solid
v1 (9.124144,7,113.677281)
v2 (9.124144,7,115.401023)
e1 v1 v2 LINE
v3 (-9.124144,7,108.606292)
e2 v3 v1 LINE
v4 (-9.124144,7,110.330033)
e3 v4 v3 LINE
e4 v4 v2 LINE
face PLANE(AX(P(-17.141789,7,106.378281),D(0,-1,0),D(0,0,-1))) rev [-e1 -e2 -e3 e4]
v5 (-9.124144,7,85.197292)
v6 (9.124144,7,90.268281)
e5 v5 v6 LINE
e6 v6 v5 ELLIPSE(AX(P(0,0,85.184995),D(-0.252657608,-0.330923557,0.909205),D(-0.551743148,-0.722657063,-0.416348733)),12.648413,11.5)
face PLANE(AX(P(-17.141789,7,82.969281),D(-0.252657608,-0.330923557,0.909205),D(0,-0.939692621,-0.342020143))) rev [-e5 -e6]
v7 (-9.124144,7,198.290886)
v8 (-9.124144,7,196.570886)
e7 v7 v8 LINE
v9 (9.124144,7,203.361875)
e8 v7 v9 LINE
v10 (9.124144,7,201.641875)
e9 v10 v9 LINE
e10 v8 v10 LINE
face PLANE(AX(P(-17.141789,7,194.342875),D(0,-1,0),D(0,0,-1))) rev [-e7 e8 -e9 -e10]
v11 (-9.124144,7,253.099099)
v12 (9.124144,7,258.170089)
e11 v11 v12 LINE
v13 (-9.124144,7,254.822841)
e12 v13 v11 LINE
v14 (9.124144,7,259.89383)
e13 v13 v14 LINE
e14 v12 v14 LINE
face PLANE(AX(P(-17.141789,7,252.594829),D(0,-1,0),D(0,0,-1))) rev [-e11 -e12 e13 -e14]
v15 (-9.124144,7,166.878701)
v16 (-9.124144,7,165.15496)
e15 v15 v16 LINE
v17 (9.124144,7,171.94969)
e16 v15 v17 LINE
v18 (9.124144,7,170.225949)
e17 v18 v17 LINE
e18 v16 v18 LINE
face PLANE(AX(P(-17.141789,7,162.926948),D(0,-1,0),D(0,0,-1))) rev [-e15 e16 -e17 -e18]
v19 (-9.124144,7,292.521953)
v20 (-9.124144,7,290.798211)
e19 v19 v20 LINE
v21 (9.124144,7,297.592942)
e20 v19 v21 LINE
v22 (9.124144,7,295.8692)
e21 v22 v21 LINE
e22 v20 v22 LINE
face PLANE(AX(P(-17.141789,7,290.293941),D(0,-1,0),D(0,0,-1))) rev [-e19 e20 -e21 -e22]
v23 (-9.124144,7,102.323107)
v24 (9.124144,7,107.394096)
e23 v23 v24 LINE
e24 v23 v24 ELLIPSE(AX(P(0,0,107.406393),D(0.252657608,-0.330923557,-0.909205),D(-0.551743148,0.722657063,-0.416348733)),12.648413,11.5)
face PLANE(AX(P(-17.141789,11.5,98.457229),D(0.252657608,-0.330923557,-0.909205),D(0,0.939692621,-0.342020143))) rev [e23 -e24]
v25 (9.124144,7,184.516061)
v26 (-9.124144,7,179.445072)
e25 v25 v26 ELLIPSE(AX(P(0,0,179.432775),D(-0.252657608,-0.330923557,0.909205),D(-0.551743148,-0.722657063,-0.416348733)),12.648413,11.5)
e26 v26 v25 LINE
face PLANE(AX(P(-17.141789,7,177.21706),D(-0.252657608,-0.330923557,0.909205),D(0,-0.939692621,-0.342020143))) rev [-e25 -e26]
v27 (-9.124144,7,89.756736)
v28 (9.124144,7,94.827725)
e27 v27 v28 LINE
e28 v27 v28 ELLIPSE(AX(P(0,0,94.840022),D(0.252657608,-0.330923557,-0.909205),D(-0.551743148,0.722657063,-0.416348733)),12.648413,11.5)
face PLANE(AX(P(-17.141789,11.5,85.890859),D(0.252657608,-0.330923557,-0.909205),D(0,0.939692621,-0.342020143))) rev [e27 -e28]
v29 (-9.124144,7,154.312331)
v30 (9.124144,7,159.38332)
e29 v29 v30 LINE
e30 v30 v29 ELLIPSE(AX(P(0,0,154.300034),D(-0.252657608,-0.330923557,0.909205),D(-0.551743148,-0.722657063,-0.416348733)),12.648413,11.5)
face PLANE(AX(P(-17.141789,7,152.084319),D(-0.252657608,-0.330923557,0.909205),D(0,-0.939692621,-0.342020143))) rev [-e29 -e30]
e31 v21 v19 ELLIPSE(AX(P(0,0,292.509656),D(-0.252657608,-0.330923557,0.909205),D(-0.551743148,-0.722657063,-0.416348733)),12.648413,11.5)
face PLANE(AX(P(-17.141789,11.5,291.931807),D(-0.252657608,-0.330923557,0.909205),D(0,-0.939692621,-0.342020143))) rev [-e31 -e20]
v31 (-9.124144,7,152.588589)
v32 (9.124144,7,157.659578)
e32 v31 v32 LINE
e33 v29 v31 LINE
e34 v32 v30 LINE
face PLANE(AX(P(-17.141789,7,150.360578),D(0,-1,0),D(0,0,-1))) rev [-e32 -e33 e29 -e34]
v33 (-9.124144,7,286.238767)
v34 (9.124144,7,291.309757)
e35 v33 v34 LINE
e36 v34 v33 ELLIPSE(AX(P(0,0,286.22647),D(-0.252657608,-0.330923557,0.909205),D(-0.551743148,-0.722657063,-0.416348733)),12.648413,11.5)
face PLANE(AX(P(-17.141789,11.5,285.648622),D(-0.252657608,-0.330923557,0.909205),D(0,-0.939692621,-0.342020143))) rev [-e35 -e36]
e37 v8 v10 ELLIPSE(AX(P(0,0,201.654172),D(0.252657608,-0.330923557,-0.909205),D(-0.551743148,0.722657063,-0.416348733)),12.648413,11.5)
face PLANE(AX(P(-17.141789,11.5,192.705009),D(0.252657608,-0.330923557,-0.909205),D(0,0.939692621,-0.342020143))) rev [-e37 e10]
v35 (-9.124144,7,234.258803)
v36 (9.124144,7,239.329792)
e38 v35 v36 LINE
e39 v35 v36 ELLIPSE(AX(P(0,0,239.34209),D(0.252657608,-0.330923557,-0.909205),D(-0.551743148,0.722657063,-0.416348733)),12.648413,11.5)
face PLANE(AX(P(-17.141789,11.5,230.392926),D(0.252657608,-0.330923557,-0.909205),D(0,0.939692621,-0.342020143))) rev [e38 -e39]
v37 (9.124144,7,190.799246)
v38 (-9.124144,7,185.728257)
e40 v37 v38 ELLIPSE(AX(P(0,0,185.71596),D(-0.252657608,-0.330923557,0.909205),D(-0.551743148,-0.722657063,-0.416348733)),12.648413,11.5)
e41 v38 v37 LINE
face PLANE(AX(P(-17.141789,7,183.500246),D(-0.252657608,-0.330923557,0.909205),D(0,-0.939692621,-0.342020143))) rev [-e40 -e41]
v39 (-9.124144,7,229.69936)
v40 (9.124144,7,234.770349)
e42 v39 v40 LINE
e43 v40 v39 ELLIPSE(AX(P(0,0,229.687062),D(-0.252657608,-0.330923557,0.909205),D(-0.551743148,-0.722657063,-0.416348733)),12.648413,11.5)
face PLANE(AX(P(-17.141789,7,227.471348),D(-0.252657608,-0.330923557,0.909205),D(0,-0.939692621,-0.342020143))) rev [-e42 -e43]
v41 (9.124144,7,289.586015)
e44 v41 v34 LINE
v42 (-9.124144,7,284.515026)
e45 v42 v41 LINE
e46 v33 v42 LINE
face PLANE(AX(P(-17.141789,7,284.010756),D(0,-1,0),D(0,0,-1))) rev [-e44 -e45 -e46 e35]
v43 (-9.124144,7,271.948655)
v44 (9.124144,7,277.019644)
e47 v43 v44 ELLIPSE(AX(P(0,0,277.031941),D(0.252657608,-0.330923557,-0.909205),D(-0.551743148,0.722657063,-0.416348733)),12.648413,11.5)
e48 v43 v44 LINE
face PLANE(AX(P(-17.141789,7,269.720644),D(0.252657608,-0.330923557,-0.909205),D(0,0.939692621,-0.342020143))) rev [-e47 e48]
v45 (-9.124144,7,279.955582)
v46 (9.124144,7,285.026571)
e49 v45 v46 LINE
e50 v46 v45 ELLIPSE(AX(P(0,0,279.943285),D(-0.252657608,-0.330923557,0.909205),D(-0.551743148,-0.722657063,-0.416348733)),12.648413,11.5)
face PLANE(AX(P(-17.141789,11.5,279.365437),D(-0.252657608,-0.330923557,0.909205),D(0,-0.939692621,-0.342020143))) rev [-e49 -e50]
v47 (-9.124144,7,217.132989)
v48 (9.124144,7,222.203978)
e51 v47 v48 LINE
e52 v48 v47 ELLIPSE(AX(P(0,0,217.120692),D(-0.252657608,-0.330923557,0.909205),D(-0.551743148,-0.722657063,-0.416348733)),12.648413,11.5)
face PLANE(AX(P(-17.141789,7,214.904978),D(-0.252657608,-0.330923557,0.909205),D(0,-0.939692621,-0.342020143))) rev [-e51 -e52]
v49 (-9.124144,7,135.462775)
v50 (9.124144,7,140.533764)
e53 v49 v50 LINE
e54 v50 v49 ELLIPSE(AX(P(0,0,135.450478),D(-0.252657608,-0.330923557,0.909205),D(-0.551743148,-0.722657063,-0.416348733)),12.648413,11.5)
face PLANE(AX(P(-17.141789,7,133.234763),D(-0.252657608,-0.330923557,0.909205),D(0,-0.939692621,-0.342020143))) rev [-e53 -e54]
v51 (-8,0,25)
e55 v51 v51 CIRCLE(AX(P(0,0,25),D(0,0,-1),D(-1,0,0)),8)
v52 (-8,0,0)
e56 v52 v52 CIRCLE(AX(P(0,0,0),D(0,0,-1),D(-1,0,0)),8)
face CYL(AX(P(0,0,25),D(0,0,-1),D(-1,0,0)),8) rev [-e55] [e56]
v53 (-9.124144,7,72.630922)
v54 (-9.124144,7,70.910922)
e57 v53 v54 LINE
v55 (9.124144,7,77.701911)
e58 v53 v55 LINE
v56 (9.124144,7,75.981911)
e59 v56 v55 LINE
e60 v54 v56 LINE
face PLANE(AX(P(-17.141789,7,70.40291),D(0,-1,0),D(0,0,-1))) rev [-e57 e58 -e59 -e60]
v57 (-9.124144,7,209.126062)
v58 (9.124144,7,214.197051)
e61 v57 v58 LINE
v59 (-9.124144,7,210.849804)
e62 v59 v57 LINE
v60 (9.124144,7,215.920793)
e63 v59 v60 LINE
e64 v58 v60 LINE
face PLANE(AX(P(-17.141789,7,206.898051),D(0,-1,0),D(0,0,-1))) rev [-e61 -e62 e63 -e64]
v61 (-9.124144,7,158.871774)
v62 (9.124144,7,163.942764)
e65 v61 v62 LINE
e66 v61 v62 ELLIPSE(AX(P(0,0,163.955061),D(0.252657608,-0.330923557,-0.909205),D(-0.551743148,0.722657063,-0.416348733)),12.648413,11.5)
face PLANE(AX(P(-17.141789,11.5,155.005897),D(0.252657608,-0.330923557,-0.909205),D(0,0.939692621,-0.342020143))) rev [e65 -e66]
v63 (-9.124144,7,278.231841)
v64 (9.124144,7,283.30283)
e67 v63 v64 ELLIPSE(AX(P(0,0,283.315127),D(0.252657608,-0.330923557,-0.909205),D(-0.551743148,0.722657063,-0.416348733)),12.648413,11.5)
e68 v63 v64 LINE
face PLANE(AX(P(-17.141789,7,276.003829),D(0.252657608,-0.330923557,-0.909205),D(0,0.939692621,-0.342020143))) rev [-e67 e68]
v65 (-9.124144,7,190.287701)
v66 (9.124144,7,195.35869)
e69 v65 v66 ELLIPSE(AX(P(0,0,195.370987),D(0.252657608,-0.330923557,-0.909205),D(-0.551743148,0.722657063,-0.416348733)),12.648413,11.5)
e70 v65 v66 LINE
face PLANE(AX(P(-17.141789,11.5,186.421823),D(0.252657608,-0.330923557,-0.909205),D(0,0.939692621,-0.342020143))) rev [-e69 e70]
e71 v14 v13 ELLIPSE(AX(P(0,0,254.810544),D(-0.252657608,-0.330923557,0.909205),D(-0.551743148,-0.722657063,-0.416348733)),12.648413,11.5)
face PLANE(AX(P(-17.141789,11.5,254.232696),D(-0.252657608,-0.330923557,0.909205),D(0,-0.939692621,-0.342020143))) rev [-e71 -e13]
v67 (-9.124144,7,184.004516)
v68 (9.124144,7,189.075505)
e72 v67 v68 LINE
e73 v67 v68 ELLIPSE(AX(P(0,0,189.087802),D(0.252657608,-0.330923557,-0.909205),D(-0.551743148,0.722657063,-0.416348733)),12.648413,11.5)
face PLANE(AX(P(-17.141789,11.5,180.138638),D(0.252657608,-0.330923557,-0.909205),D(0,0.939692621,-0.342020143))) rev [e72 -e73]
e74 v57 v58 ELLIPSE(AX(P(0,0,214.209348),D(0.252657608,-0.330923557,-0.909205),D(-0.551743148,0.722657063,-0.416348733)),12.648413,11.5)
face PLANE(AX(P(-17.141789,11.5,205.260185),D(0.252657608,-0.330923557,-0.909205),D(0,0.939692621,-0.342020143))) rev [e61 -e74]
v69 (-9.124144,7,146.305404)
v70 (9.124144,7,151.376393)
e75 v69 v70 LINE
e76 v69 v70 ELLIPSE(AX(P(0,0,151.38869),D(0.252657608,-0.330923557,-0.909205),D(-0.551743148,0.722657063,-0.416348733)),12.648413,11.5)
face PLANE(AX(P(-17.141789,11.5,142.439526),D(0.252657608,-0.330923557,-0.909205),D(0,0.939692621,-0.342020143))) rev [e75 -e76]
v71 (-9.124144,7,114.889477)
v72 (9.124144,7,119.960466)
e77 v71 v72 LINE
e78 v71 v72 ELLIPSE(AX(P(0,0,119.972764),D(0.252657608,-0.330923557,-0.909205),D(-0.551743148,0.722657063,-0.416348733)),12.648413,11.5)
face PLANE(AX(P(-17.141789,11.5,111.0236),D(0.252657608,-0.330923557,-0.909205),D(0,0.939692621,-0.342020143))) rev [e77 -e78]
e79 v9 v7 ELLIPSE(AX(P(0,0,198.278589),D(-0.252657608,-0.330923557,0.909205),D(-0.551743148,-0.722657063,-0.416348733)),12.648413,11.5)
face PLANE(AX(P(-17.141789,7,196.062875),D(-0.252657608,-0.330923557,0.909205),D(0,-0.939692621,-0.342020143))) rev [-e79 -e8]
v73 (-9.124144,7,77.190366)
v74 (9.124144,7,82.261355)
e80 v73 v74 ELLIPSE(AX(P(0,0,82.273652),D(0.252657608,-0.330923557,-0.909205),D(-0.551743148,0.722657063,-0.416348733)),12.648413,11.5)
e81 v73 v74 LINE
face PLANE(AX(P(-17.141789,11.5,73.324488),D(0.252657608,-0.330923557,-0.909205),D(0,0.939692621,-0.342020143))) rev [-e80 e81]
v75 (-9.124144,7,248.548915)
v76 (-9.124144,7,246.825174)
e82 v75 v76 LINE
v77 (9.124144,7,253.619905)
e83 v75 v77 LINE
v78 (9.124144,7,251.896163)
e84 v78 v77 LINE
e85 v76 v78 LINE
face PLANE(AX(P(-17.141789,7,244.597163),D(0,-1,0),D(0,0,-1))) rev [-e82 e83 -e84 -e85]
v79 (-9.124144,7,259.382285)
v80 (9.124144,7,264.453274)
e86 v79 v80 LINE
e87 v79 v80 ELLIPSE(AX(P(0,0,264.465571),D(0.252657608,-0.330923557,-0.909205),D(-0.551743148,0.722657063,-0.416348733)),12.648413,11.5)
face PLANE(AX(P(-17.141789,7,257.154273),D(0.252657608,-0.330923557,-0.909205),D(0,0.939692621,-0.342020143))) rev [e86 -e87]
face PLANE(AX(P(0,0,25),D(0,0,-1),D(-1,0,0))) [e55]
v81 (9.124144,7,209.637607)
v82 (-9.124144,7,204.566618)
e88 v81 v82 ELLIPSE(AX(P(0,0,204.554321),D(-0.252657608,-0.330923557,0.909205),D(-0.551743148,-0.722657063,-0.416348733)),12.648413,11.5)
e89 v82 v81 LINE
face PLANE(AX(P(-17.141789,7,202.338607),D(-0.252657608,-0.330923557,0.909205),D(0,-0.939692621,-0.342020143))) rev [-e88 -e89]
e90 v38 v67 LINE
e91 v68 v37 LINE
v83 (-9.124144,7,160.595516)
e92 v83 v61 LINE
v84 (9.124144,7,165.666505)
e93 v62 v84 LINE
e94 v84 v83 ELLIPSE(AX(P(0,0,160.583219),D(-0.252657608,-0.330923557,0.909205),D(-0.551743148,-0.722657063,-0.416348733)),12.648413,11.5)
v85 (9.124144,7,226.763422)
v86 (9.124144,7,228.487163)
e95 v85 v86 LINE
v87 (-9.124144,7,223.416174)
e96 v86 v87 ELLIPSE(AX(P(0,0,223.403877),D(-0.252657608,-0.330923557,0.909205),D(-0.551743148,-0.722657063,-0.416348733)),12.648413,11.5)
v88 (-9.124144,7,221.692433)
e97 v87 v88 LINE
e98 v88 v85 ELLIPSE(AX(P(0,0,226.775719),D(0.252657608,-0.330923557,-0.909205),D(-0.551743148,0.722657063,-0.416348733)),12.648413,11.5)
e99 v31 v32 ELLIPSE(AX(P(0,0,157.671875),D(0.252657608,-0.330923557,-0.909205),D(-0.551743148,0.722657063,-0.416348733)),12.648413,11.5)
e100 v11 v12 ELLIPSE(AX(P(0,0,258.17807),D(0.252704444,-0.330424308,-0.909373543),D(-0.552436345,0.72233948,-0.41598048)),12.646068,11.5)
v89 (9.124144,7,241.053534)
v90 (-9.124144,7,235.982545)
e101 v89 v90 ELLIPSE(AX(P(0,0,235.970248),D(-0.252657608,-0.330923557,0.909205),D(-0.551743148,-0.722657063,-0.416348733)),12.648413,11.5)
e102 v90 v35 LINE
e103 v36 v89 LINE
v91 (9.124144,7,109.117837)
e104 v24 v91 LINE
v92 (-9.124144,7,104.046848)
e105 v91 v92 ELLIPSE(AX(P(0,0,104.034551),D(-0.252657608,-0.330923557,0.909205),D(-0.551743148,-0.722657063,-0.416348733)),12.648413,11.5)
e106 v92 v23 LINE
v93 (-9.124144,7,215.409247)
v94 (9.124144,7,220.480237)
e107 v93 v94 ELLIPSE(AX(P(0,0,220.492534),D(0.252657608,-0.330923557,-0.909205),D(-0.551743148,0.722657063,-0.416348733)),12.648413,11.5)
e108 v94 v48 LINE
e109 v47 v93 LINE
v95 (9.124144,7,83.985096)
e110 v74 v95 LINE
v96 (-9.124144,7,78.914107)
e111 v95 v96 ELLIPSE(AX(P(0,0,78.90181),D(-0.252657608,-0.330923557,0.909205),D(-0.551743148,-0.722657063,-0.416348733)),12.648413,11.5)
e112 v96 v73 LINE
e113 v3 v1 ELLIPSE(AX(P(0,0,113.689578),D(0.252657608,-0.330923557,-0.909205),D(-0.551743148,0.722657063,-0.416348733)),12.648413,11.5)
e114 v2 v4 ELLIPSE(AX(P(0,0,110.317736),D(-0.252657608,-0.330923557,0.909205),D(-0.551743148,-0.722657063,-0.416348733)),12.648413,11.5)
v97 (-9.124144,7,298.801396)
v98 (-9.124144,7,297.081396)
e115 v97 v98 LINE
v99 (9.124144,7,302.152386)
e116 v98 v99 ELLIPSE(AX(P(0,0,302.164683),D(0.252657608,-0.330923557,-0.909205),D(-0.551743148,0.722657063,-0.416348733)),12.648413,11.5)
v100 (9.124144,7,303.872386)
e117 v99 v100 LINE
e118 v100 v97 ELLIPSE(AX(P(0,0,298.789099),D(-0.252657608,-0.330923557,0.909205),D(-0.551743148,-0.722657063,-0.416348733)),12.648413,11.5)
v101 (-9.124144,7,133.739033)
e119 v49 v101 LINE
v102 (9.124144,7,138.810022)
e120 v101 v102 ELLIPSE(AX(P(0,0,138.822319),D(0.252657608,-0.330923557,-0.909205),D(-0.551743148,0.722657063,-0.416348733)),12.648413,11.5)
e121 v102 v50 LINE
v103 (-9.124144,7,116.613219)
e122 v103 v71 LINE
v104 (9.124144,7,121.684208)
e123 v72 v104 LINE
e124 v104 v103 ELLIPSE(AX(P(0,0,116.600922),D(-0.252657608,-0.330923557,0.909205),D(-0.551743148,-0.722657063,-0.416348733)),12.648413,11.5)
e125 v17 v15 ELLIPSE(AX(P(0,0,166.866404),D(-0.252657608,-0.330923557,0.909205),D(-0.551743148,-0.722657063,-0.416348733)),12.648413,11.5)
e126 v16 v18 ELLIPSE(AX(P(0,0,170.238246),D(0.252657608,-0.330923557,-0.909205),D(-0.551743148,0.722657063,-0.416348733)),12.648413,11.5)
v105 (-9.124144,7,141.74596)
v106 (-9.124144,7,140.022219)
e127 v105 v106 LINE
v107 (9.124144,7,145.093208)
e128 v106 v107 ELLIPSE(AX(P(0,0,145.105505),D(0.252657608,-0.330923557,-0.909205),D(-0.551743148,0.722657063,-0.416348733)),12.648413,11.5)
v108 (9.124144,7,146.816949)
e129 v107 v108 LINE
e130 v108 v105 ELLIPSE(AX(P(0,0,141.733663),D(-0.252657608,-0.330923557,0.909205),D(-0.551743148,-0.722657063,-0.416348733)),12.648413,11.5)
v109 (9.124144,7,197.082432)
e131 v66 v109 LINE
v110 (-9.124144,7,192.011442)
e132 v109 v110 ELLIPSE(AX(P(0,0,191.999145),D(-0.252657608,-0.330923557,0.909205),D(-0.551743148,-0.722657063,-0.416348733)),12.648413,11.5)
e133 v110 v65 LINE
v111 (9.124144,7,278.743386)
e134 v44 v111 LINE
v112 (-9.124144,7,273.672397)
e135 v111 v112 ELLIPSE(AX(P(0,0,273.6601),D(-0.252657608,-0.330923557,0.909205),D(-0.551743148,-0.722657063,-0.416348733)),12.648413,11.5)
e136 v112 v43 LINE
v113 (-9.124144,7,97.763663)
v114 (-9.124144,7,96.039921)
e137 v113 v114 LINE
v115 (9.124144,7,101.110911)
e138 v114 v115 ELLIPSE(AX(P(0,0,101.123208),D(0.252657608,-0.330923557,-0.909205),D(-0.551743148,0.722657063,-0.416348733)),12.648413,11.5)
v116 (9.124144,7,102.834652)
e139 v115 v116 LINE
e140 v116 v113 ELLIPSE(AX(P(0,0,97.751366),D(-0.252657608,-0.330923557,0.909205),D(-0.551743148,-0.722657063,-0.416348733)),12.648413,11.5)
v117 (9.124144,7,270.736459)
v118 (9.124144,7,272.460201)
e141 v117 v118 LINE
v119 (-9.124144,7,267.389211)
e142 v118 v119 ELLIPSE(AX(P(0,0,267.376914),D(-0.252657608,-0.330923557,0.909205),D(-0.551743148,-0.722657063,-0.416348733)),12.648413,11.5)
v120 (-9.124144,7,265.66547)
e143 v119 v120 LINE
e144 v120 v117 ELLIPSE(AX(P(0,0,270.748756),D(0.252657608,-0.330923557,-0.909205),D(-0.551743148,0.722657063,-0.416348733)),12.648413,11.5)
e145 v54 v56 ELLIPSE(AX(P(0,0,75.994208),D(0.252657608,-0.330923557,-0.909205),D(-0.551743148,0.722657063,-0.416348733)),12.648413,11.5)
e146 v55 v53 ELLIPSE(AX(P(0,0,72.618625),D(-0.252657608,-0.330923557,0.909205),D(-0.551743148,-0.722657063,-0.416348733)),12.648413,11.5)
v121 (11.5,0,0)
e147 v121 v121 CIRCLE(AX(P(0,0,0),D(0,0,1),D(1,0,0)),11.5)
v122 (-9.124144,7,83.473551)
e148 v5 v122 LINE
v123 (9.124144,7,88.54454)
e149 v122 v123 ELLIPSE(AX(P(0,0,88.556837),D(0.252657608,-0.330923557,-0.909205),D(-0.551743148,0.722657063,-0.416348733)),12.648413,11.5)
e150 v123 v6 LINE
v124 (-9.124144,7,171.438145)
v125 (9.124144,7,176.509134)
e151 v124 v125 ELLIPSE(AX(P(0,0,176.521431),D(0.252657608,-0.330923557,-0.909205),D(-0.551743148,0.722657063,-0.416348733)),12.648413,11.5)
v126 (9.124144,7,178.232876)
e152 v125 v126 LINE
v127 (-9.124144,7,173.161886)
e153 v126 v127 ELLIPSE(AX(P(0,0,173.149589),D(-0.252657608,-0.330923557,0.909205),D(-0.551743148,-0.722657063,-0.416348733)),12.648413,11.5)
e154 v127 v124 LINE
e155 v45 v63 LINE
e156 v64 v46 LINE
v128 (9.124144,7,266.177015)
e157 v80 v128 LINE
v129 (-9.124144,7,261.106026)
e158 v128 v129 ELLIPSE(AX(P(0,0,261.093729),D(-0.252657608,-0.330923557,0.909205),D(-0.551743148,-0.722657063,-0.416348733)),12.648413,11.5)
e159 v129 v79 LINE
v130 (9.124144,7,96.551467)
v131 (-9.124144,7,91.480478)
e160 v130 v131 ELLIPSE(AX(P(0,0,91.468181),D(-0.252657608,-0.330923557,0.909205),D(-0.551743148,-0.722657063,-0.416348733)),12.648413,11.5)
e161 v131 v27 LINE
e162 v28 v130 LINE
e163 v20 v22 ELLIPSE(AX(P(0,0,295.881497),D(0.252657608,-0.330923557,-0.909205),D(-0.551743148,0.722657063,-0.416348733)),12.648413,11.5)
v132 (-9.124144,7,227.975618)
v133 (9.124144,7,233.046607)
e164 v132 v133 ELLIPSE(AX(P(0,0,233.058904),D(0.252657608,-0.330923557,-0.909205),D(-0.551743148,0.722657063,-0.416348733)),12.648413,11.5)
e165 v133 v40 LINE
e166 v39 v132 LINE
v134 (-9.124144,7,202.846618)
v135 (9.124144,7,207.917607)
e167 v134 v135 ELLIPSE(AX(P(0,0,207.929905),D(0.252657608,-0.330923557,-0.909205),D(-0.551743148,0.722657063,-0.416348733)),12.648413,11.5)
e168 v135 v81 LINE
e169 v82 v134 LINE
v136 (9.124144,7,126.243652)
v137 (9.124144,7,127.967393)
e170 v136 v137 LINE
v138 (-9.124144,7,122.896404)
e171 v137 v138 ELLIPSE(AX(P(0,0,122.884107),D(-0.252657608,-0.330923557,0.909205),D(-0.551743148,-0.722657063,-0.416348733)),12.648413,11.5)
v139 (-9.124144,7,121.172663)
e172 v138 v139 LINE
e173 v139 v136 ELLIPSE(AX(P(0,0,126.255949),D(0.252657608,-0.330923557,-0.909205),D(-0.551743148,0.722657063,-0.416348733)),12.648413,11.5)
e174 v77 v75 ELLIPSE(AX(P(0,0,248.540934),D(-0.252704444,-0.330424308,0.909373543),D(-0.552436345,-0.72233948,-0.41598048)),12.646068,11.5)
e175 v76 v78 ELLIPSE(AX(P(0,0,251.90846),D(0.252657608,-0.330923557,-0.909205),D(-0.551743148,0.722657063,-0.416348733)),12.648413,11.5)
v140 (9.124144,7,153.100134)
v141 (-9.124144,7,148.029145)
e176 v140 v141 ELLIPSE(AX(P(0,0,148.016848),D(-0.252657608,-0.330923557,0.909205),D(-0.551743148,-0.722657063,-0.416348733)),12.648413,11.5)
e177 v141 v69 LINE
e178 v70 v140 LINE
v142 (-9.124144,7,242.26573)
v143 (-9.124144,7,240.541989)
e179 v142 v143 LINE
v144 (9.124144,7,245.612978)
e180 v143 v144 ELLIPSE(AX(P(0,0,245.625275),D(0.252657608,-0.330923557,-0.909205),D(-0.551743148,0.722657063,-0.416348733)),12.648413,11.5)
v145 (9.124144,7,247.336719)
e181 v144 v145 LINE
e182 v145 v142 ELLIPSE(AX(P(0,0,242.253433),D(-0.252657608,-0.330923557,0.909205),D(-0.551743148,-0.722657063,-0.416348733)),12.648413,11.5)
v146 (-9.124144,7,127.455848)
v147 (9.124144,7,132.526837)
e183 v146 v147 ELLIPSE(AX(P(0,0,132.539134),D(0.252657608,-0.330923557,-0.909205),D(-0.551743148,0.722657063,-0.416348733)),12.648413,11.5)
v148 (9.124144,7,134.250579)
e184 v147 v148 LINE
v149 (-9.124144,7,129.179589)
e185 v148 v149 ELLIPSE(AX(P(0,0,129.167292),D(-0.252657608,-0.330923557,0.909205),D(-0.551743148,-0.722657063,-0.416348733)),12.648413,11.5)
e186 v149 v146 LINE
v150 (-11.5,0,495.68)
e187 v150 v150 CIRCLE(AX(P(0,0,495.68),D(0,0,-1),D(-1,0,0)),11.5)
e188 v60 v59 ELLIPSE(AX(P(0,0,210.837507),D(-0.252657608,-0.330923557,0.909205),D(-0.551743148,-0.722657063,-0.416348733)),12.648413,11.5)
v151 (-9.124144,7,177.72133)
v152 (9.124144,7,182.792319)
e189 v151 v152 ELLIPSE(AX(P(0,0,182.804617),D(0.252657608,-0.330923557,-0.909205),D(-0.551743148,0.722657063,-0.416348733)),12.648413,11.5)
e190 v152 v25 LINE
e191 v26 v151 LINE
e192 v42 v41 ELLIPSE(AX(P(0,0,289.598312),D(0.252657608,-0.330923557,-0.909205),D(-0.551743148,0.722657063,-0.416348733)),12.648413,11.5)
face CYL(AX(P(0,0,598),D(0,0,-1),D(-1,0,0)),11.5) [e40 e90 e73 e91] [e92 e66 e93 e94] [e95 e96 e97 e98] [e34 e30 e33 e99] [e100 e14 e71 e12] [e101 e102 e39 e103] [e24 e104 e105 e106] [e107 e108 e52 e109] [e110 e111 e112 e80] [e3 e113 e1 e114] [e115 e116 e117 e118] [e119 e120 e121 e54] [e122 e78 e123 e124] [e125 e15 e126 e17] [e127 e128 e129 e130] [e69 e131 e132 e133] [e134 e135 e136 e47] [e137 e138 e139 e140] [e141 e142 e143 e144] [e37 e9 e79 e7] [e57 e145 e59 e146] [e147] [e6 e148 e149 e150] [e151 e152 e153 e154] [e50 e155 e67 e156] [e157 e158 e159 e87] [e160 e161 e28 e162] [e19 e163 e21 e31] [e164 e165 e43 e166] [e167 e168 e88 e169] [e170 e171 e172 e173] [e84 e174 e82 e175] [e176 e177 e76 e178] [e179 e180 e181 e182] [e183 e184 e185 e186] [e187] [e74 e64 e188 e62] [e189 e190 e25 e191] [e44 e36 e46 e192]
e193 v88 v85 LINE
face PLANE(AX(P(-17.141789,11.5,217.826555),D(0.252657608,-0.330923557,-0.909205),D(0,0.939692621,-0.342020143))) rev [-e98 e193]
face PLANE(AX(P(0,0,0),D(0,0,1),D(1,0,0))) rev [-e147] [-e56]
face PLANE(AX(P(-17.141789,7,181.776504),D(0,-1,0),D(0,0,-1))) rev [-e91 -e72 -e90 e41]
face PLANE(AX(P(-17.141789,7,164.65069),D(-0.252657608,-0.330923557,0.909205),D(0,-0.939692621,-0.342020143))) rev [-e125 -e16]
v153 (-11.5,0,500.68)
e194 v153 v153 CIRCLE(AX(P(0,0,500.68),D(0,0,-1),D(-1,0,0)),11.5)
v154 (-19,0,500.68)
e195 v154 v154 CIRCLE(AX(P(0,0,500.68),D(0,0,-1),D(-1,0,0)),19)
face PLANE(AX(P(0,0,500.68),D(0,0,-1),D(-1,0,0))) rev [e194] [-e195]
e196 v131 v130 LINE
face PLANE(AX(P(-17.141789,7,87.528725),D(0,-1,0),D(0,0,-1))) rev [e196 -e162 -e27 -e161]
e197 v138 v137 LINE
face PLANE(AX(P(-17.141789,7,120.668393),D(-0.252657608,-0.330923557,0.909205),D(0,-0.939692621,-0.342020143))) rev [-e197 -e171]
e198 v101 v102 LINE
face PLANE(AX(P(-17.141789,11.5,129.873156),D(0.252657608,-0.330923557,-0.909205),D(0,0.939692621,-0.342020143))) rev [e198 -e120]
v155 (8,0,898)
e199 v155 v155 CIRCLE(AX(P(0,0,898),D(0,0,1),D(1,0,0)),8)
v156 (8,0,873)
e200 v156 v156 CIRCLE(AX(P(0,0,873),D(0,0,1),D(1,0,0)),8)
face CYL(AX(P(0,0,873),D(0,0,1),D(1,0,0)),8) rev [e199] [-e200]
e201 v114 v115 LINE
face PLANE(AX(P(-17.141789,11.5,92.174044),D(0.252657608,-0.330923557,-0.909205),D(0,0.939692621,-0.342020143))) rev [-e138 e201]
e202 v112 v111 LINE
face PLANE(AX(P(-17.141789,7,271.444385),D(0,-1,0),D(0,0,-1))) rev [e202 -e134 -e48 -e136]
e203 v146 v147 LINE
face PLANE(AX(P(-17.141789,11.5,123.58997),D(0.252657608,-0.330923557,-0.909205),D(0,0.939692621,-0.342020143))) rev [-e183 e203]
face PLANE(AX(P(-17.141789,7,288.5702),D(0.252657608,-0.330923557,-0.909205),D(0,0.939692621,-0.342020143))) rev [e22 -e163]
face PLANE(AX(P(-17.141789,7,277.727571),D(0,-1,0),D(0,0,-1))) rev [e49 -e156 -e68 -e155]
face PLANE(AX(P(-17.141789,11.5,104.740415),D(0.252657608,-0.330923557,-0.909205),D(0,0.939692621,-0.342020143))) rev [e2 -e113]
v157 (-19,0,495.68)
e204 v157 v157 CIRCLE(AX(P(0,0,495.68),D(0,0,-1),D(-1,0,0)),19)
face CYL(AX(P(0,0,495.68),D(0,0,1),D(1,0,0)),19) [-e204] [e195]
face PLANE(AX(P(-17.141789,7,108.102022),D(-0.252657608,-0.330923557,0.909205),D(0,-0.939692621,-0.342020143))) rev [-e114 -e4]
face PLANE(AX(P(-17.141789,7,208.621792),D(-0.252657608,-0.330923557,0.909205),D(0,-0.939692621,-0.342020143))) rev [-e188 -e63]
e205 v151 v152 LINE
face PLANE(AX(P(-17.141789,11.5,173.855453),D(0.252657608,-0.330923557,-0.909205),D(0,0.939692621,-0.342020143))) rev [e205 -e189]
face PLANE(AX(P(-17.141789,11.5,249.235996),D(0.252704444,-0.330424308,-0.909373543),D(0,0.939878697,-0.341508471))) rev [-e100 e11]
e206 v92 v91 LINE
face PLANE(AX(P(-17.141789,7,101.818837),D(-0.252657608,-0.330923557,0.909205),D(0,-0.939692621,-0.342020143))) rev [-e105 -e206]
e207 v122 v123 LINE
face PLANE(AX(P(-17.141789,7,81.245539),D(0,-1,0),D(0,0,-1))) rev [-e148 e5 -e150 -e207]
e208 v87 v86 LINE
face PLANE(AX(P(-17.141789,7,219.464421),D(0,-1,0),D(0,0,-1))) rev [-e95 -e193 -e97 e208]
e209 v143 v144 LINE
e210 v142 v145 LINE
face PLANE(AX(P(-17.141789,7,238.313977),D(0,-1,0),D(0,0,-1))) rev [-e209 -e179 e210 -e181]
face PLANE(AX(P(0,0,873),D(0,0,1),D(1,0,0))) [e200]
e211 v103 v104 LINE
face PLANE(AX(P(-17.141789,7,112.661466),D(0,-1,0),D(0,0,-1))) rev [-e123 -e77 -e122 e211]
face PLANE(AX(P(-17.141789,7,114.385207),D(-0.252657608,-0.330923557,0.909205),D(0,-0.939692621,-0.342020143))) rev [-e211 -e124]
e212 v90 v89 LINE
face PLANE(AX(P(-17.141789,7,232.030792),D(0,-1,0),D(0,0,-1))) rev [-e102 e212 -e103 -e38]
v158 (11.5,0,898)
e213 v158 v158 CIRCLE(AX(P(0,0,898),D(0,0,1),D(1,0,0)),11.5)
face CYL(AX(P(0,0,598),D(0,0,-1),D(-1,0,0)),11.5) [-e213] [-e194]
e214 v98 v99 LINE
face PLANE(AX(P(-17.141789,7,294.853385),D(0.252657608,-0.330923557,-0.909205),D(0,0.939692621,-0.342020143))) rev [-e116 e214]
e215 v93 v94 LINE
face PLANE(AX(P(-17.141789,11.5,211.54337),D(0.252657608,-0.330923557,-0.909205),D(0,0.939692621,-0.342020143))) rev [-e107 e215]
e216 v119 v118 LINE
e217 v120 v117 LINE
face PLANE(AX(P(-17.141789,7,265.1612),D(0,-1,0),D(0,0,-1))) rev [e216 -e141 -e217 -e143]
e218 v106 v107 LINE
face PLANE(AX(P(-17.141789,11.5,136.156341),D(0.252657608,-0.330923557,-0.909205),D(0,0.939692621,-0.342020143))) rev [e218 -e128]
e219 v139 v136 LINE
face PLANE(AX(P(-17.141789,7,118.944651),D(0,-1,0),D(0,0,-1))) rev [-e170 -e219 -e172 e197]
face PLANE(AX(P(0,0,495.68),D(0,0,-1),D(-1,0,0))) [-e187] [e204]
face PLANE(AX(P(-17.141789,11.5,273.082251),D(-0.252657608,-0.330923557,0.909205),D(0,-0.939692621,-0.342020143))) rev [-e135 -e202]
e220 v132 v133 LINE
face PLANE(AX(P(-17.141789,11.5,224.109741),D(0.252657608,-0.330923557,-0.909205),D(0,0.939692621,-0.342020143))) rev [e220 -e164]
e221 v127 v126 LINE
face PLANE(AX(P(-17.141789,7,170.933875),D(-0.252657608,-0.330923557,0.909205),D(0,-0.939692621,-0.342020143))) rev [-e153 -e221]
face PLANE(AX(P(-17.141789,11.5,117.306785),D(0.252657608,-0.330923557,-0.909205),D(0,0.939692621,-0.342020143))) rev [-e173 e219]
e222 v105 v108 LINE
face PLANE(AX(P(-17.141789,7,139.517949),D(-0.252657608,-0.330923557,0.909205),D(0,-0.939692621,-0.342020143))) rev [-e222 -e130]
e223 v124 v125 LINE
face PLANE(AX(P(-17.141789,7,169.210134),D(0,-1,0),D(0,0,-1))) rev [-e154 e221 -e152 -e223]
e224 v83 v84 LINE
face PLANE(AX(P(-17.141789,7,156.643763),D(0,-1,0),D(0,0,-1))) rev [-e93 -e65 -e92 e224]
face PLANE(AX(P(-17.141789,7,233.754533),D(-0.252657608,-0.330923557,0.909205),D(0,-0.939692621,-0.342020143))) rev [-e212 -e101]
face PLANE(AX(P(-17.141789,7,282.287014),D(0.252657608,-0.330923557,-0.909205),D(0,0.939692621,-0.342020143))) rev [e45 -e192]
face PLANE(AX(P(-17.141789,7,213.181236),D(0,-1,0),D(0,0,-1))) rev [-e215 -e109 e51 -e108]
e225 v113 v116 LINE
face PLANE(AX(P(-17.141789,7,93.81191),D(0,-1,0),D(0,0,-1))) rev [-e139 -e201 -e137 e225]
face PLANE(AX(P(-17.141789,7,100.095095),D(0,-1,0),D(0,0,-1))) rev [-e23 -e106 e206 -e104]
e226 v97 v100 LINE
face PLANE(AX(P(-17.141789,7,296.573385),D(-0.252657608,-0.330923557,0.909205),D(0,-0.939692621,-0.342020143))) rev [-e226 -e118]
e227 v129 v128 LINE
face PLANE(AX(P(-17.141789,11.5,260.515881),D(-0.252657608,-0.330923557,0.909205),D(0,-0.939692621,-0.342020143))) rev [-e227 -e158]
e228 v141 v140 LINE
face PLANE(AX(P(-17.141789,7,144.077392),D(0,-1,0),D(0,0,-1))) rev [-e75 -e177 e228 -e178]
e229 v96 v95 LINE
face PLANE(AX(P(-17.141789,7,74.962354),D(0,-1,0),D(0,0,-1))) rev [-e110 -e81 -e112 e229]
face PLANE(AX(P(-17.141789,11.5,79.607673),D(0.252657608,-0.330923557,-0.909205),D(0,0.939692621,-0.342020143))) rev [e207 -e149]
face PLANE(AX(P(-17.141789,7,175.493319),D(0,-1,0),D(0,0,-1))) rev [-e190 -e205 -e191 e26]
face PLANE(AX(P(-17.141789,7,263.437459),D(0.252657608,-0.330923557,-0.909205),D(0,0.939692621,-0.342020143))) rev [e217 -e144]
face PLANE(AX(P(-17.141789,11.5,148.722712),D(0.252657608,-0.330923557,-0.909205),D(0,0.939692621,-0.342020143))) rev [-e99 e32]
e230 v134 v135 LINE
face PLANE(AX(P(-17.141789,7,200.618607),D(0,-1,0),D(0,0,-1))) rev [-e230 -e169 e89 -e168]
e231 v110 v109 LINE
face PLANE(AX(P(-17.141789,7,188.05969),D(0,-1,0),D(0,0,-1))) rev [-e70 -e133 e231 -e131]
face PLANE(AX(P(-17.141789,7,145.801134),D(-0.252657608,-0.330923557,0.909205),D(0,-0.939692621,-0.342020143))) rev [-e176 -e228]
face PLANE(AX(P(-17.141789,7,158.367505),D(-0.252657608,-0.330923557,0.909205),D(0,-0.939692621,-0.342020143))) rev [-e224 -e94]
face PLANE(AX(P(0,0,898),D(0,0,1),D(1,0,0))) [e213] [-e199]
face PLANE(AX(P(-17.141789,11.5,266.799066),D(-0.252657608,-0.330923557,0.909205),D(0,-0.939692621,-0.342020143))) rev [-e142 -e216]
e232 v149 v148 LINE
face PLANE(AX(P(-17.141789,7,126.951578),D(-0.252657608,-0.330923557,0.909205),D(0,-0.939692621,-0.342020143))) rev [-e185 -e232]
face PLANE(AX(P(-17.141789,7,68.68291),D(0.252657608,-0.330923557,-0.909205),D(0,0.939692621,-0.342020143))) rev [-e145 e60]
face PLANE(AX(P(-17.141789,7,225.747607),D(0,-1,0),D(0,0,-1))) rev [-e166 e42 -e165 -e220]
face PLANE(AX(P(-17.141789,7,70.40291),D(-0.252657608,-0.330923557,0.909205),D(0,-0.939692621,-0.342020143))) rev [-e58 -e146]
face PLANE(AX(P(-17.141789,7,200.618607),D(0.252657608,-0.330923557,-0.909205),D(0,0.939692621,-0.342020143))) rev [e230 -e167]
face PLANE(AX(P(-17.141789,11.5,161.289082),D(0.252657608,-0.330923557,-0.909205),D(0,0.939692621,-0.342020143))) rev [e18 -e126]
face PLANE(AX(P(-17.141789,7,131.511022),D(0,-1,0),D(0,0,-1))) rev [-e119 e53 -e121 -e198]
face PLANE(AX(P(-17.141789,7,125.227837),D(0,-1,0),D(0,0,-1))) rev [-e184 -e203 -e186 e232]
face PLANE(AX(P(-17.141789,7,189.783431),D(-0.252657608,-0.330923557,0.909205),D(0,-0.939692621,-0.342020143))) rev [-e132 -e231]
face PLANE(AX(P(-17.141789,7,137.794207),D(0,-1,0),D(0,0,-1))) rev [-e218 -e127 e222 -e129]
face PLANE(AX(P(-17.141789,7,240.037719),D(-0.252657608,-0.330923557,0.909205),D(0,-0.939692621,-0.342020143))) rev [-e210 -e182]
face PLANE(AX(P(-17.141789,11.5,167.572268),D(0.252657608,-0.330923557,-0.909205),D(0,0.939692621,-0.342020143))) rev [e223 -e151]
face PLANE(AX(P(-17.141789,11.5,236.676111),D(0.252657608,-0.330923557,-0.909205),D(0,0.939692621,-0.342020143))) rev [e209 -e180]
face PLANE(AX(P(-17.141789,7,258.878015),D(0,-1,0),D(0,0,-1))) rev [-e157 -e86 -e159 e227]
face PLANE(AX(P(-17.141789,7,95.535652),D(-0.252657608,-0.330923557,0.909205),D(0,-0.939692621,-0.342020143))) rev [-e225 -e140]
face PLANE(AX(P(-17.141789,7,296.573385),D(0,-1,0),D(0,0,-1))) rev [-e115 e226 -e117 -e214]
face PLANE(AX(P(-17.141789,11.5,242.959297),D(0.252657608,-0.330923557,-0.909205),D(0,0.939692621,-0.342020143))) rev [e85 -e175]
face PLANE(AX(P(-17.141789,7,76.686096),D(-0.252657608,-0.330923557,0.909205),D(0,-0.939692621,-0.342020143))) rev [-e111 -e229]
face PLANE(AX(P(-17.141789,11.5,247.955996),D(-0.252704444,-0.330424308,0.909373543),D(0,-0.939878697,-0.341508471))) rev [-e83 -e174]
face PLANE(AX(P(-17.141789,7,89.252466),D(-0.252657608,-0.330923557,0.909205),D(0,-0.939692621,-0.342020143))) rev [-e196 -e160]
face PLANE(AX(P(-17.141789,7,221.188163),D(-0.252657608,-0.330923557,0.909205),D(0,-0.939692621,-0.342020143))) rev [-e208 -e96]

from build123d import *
from build123d.topology import SkipClean

# Parameters (mm, degrees)
SKETCH5_R            = 11.5
BOSS_EXTRUDE13_DEPTH = 598
SKETCH1_R            = 8
CUT_EXTRUDE2_DEPTH   = 17
CUT_EXTRUDE3_START   = -25
SKETCH9_R            = 8
CUT_EXTRUDE3_DEPTH   = 25
SKETCH22_R           = 29.020137942
SKETCH22_R_2         = 19
CUT_EXTRUDE4_DEPTH   = 10
SKETCH23_R           = 8
BOSS_EXTRUDE1_DEPTH  = 17
SKETCH24_R           = 11.5
BOSS_EXTRUDE2_DEPTH  = 300
SKETCH25_R           = 8
CUT_EXTRUDE5_DEPTH   = 25
BOSS_EXTRUDE3_DEPTH  = 14.86
CUT_EXTRUDE7_START   = 36
SKETCH29_R           = 21.777311072
SKETCH29_R_2         = 11.5
CUT_EXTRUDE7_DEPTH   = 36
SKETCH30_R           = 19
SKETCH30_R_2         = 11.5
CUT_EXTRUDE8_DEPTH   = 18
SKETCH27_R           = 19
BOSS_EXTRUDE9_DEPTH  = 10.03
CUT_EXTRUDE9_DEPTH   = 10.03
SKETCH35_W           = 23.953949438
SKETCH35_H           = 2.96512498
BOSS_EXTRUDE10_DEPTH = 147.5
SKETCH36_W           = 6.58
SKETCH36_H           = 5.13043091
CUT_EXTRUDE10_DEPTH  = 147.5
BOSS_EXTRUDE11_START = 5
SKETCH37_R           = 19
BOSS_EXTRUDE11_DEPTH = 5
SKETCH38_W           = 23.953949438
SKETCH38_H           = 2.96512498
CUT_EXTRUDE11_DEPTH  = 182
SKETCH39_R           = 19
SKETCH39_R_2         = 11.5
CUT_EXTRUDE12_DEPTH  = 34


with BuildPart() as part:
    # Sketch5 → Boss-Extrude13 (new body)
    with BuildSketch(Plane.XY):
        Circle(SKETCH5_R)
    extrude(amount=BOSS_EXTRUDE13_DEPTH)

    # Swept-Cut1: sweep along a path in Sketch7
    with BuildLine(Plane(origin=(0, 0, 0), x_dir=(1, 0, 0), z_dir=(0, 1, 0))) as swept_cut1_path:
        Line((11.5, -47.002601747), (-17.141789086, -39.043378107))
    # Sketch6 → Swept-Cut1 (sweep, cut)
    with BuildSketch(Plane(origin=(11.5, 0, 0), x_dir=(0, 0, -1), z_dir=(1, 0, 0))):
        Polygon((-78.362133946, 7), (-80, 11.5), (-81.283711713, 11.5), (-82.921577767, 7), (-84.645319246, 7), (-86.2831853, 11.5), (-87.566897013, 11.5), (-89.204763067, 7), (-90.928504546, 7), (-92.5663706, 11.5), (-93.850082313, 11.5), (-95.487948367, 7), (-97.211689846, 7), (-98.8495559, 11.5), (-100.133267613, 11.5), (-101.771133667, 7), (-103.494875146, 7), (-105.1327412, 11.5), (-106.416452913, 11.5), (-108.054318967, 7), (-109.778060446, 7), (-111.4159265, 11.5), (-112.699638213, 11.5), (-114.337504267, 7), (-116.061245746, 7), (-117.6991118, 11.5), (-118.982823513, 11.5), (-120.620689567, 7), (-122.344431046, 7), (-123.9822971, 11.5), (-125.266008813, 11.5), (-126.903874867, 7), (-128.627616346, 7), (-130.2654824, 11.5), (-131.549194113, 11.5), (-133.187060167, 7), (-134.910801646, 7), (-136.5486677, 11.5), (-137.832379413, 11.5), (-139.470245467, 7), (-141.193986946, 7), (-142.831853, 11.5), (-144.115564713, 11.5), (-145.753430767, 7), (-147.477172246, 7), (-149.1150383, 11.5), (-150.398750013, 11.5), (-152.036616067, 7), (-153.760357546, 7), (-155.3982236, 11.5), (-156.681935313, 11.5), (-158.319801367, 7), (-160.043542846, 7), (-161.6814089, 11.5), (-162.965120613, 11.5), (-164.602986667, 7), (-166.326728146, 7), (-167.9645942, 11.5), (-169.248305913, 11.5), (-170.886171967, 7), (-172.609913446, 7), (-174.2477795, 11.5), (-175.531491213, 11.5), (-177.169357267, 7), (-178.893098746, 7), (-180.5309648, 11.5), (-181.814676513, 11.5), (-183.452542567, 7), (-185.176284046, 7), (-186.8141501, 11.5), (-188.097861813, 11.5), (-189.735727867, 7), (-191.459469346, 7), (-193.0973354, 11.5), (-194.381047113, 11.5), (-196.018913167, 7), (-197.742654646, 7), (-199.3805207, 11.5), (-200.664232413, 11.5), (-202.302098467, 7), (-204.022098467, 7), (-206.232393599, 13.072735964), (-74.431838814, 13.072735964), (-76.642133946, 7), align=None)
    sweep(path=swept_cut1_path.line, mode=Mode.SUBTRACT)

    # Sketch11 → Revolve1 (revolve)
    with BuildSketch(Plane(origin=(0, 0, 0), x_dir=(0, 0, -1), z_dir=(1, 0, 0))):
        Polygon((-380, 19), (-380, 11.5), (-390, 11.5), (-390, 14.64168316), (-387.653886088, 15.505251056), (-388.273828958, 17.92716576), (-388.161331121, 22.925900024), (-382.5, 19), align=None)
    revolve(axis=Axis((0, 0, 0), (0, 0, 1)))

    # Sketch1 → Cut-Extrude2 (cut)
    with BuildSketch(Plane.XY.offset(598)):
        Circle(SKETCH1_R)
    extrude(amount=-CUT_EXTRUDE2_DEPTH, mode=Mode.SUBTRACT)

    # Sketch9 → Cut-Extrude3 (cut)
    with BuildSketch(Plane(origin=(0, 0, 0), x_dir=(-1, 0, 0), z_dir=(0, 0, -1)).offset(CUT_EXTRUDE3_START)):
        Circle(SKETCH9_R)
    extrude(amount=CUT_EXTRUDE3_DEPTH, mode=Mode.SUBTRACT)

    # Cut-Sweep1: sweep along a path in Çizim7<3>
    with BuildLine(Plane(origin=(0, 0, 0), x_dir=(1, 0, 0), z_dir=(0, 1, 0))) as cut_sweep1_path:
        Line((25.154101774, -50.796919528), (-17.141789086, -39.043378107))
    # Sketch14 → Cut-Sweep1 (sweep, cut)
    with BuildSketch(Plane(origin=(11.5, 0, 0), x_dir=(0, 0, -1), z_dir=(1, 0, 0))):
        Polygon((-208.577830576, 7), (-206.368790882, 13.069286677), (-256.48542589, 13.069286677), (-306.741648428, 13.069286677), (-304.532608735, 7), (-302.812608735, 7), (-301.174742681, 11.5), (-299.891030968, 11.5), (-298.253164913, 7), (-296.529423435, 7), (-294.891557381, 11.5), (-293.607845668, 11.5), (-291.969979613, 7), (-290.246238135, 7), (-288.608372081, 11.5), (-287.324660368, 11.5), (-285.686794313, 7), (-283.963052835, 7), (-282.325186781, 11.5), (-281.041475068, 11.5), (-279.403609013, 7), (-277.679867535, 7), (-276.042001481, 11.5), (-274.758289768, 11.5), (-273.120423713, 7), (-271.396682235, 7), (-269.758816181, 11.5), (-268.475104468, 11.5), (-266.837238413, 7), (-265.113496935, 7), (-263.475630881, 11.5), (-262.191919168, 11.5), (-260.554053113, 7), (-258.830311635, 7), (-257.195219655, 11.5), (-255.915219655, 11.5), (-254.280127676, 7), (-252.556386197, 7), (-250.918520143, 11.5), (-249.63480843, 11.5), (-247.996942376, 7), (-246.273200897, 7), (-244.635334843, 11.5), (-243.35162313, 11.5), (-241.713757076, 7), (-239.990015597, 7), (-238.352149543, 11.5), (-237.06843783, 11.5), (-235.430571776, 7), (-233.706830297, 7), (-232.068964243, 11.5), (-230.78525253, 11.5), (-229.147386476, 7), (-227.423644997, 7), (-225.785778943, 11.5), (-224.50206723, 11.5), (-222.864201176, 7), (-221.140459697, 7), (-219.502593643, 11.5), (-218.21888193, 11.5), (-216.581015876, 7), (-214.857274397, 7), (-213.219408343, 11.5), (-211.93569663, 11.5), (-210.297830576, 7), align=None)
    sweep(path=cut_sweep1_path.line, mode=Mode.SUBTRACT)

    # Sketch22 → Cut-Extrude4 (cut)
    with SkipClean():  # the faces are left unmerged after this step: merging them gives an invalid solid
        with BuildSketch(Plane(origin=(0, 0, 380), x_dir=(-1, 0, 0), z_dir=(0, 0, -1))):
            Circle(SKETCH22_R)
            Circle(SKETCH22_R_2, mode=Mode.SUBTRACT)
        extrude(amount=-CUT_EXTRUDE4_DEPTH, mode=Mode.SUBTRACT)

    # Sketch23 → Boss-Extrude1 (add)
    with SkipClean():  # the faces are left unmerged after this step: merging them gives an invalid solid
        with BuildSketch(Plane.XY.offset(598)):
            Circle(SKETCH23_R)
        extrude(amount=-BOSS_EXTRUDE1_DEPTH)

    # Sketch24 → Boss-Extrude2 (add)
    with SkipClean():  # the faces are left unmerged after this step: merging them gives an invalid solid
        with BuildSketch(Plane.XY.offset(598)):
            Circle(SKETCH24_R)
        extrude(amount=BOSS_EXTRUDE2_DEPTH)

    # Sketch25 → Cut-Extrude5 (cut)
    with SkipClean():  # the faces are left unmerged after this step: merging them gives an invalid solid
        with BuildSketch(Plane.XY.offset(898)):
            Circle(SKETCH25_R)
        extrude(amount=-CUT_EXTRUDE5_DEPTH, mode=Mode.SUBTRACT)

    # Sketch26 → Boss-Extrude3 (add)
    with SkipClean():  # the faces are left unmerged after this step: merging them gives an invalid solid
        with BuildSketch(Plane(origin=(0, 0, 380), x_dir=(-1, 0, 0), z_dir=(0, 0, -1))):
            with BuildLine():
                ThreePointArc((0.243811626, 18.825934841), (-13.39898566, -13.226581192), (18.827513557, 0))
                ThreePointArc((18.827513557, 0), (13.39898566, 13.226581192), (0.243811626, 18.825934841))
            make_face()
            with BuildLine():
                ThreePointArc((15.805163127, 7.71617291), (-10.992581615, -14.686603394), (1.492833529, 17.934216921))
                Line((1.492833529, 17.934216921), (15.805163127, 7.71617291))
            make_face(mode=Mode.SUBTRACT)
        extrude(amount=BOSS_EXTRUDE3_DEPTH)
    add(part.part.scale(1), mode=Mode.REPLACE)  # the faces are merged on a copy

    # Sketch29 → Cut-Extrude7 (cut)
    with SkipClean():  # the faces are left unmerged after this step: merging them gives an invalid solid
        with BuildSketch(Plane(origin=(0, 0, 380), x_dir=(-1, 0, 0), z_dir=(0, 0, -1)).offset(CUT_EXTRUDE7_START)):
            Circle(SKETCH29_R)
            Circle(SKETCH29_R_2, mode=Mode.SUBTRACT)
        extrude(amount=-CUT_EXTRUDE7_DEPTH, mode=Mode.SUBTRACT)

    # Sketch30 → Cut-Extrude8 (cut)
    with BuildSketch(Plane(origin=(0, 0, 380), x_dir=(-1, 0, 0), z_dir=(0, 0, -1))):
        Circle(SKETCH30_R)
        Circle(SKETCH30_R_2, mode=Mode.SUBTRACT)
    extrude(amount=-CUT_EXTRUDE8_DEPTH, mode=Mode.SUBTRACT)

    # Sketch27 → Boss-Extrude9 (add)
    with BuildSketch(Plane(origin=(0, 0, 631.57), x_dir=(-1, 0, 0), z_dir=(0, 0, -1))):
        Circle(SKETCH27_R)
    extrude(amount=-BOSS_EXTRUDE9_DEPTH)

    # Sketch33 → Cut-Extrude9 (cut)
    with BuildSketch(Plane.XY.offset(641.6)):
        with BuildLine():
            Line((-11.294482638, 15.278568714), (12.937932633, 15.278568714))
            ThreePointArc((12.937932633, 15.278568714), (0.821724997, 27.394776349), (-11.294482638, 15.278568714))
        make_face()
    extrude(amount=-CUT_EXTRUDE9_DEPTH, mode=Mode.SUBTRACT)

    # Sketch35 → Boss-Extrude10 (add)
    with BuildSketch(Plane.XY.offset(641.6)):
        with Locations((0.682492081, 16.761131204)):
            Rectangle(SKETCH35_W, SKETCH35_H)
    extrude(amount=-BOSS_EXTRUDE10_DEPTH)

    # Sketch36 → Cut-Extrude10 (cut)
    with BuildSketch(Plane(origin=(12.6594668, 0, 0), x_dir=(0, 0, -1), z_dir=(1, 0, 0))):
        with Locations((-497.39, 17.843784169)):
            Rectangle(SKETCH36_W, SKETCH36_H)
    extrude(amount=-CUT_EXTRUDE10_DEPTH, mode=Mode.SUBTRACT)

    # Sketch37 → Boss-Extrude11 (add)
    with BuildSketch(Plane(origin=(0, 0, 500.68), x_dir=(-1, 0, 0), z_dir=(0, 0, -1)).offset(BOSS_EXTRUDE11_START)):
        Circle(SKETCH37_R)
    extrude(amount=-BOSS_EXTRUDE11_DEPTH)

    # Sketch38 → Cut-Extrude11 (cut)
    with BuildSketch(Plane(origin=(0, 0, 500.68), x_dir=(-1, 0, 0), z_dir=(0, 0, -1))):
        with Locations((-0.682492081, 16.761131204)):
            Rectangle(SKETCH38_W, SKETCH38_H)
    extrude(amount=-CUT_EXTRUDE11_DEPTH, mode=Mode.SUBTRACT)

    # Sketch39 → Cut-Extrude12 (cut)
    with BuildSketch(Plane(origin=(0, 0, 631.57), x_dir=(-1, 0, 0), z_dir=(0, 0, -1))):
        Circle(SKETCH39_R)
        Circle(SKETCH39_R_2, mode=Mode.SUBTRACT)
    extrude(amount=-CUT_EXTRUDE12_DEPTH, mode=Mode.SUBTRACT)


solid = part.part
